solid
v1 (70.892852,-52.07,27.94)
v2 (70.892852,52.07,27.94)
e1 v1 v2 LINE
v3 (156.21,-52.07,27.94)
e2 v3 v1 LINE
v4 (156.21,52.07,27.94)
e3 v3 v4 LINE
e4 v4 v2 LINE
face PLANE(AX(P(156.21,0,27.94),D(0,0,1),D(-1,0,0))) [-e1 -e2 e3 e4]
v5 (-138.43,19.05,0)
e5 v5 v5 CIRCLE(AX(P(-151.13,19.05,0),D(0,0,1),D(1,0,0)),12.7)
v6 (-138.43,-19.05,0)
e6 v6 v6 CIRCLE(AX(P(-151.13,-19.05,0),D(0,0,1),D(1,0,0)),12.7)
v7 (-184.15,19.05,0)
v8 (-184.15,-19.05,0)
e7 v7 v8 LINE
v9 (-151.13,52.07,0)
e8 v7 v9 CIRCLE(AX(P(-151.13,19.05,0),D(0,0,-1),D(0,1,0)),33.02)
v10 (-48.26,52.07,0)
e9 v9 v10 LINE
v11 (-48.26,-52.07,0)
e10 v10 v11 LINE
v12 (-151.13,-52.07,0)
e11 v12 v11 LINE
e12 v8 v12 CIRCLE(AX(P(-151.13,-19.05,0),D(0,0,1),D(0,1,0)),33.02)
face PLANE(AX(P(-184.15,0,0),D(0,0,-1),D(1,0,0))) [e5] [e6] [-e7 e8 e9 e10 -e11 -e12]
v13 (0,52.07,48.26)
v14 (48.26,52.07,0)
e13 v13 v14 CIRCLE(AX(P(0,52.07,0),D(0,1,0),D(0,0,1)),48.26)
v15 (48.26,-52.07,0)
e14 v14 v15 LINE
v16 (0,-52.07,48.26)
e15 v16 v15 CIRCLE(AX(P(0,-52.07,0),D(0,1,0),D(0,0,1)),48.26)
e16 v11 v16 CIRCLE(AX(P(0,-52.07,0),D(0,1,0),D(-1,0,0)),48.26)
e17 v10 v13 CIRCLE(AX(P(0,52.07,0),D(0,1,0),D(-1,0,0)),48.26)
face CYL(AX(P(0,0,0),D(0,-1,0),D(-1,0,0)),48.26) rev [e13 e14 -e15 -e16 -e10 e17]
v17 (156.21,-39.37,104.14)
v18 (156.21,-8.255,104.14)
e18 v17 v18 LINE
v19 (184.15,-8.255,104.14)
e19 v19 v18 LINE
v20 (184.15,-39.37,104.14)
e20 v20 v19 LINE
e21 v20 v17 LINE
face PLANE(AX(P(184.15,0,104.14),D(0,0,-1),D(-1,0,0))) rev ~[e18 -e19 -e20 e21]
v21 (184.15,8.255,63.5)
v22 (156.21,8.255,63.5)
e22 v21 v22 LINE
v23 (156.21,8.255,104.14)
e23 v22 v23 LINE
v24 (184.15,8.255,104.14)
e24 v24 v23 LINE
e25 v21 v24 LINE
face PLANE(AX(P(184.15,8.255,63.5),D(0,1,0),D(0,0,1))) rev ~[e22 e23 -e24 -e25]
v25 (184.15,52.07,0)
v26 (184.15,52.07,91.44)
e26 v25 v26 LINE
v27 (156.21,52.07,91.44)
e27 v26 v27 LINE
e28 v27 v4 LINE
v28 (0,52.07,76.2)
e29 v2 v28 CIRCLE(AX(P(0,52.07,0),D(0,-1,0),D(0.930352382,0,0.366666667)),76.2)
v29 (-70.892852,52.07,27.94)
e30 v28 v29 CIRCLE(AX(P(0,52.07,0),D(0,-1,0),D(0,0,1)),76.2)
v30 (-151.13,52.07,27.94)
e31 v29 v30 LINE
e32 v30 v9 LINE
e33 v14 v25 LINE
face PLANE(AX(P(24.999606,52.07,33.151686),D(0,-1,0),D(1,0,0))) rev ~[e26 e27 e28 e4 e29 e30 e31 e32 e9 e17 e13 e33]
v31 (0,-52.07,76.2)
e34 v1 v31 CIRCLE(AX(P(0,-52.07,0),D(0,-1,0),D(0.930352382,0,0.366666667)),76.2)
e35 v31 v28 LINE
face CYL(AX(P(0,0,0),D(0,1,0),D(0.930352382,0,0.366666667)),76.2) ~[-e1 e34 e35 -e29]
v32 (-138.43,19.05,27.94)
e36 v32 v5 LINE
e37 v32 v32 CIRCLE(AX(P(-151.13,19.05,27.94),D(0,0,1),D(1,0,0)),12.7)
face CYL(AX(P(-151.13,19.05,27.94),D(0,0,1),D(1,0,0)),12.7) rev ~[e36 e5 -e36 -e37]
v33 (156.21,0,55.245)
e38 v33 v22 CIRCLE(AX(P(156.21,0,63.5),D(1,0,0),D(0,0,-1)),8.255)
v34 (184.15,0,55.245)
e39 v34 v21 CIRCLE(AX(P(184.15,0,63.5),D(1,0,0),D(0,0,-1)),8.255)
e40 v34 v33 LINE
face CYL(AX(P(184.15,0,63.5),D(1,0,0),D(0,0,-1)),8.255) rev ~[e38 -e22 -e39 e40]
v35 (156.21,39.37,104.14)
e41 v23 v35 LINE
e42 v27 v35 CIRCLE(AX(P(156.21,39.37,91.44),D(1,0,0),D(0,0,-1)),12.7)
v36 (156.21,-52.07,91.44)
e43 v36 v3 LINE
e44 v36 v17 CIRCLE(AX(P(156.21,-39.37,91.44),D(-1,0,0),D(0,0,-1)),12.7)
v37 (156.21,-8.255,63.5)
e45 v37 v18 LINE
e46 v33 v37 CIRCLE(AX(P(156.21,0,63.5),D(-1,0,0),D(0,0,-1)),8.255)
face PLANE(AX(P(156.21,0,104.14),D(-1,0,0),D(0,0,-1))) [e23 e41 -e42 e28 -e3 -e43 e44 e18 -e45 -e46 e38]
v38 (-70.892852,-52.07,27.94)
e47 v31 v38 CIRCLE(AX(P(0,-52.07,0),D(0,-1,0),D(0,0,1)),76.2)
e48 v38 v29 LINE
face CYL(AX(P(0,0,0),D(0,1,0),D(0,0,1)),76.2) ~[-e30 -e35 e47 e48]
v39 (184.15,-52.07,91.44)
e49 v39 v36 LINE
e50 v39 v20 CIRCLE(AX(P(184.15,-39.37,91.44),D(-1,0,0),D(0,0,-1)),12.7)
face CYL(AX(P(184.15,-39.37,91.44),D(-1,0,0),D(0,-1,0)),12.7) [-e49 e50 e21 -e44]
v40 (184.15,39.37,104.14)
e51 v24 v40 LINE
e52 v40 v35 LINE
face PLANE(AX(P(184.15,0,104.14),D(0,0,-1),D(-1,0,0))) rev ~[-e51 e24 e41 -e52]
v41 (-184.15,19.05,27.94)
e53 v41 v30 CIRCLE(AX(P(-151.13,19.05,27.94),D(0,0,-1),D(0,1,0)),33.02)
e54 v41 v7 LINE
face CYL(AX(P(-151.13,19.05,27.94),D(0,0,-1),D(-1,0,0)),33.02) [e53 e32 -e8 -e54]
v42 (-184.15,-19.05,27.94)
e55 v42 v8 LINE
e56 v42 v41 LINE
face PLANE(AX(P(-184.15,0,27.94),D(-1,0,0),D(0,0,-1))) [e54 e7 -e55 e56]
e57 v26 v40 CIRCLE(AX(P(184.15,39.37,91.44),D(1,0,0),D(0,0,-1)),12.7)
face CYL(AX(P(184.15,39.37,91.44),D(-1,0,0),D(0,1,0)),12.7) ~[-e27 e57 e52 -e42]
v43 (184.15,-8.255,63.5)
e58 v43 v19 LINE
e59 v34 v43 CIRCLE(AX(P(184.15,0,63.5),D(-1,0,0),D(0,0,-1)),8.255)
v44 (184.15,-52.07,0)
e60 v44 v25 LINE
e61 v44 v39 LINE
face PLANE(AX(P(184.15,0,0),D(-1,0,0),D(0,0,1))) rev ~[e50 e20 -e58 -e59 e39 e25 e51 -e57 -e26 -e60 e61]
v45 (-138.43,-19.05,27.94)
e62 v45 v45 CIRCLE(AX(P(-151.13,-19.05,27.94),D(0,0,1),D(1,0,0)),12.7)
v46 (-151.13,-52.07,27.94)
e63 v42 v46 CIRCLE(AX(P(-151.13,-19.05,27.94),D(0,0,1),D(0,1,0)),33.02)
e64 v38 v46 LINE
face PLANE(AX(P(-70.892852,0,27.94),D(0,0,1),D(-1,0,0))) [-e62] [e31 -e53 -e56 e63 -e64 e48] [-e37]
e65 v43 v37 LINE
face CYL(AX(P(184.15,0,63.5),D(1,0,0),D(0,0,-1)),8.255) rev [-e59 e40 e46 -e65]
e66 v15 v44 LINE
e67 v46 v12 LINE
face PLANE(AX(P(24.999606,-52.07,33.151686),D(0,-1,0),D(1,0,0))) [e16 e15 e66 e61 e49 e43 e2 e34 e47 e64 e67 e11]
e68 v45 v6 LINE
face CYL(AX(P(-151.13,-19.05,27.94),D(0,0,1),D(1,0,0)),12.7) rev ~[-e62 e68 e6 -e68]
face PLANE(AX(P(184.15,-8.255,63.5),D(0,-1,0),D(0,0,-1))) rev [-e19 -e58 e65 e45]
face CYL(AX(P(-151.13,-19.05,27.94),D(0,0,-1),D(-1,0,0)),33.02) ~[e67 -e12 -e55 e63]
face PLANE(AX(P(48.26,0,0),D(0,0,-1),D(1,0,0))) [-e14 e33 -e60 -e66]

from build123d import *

# Parameters (mm, degrees)
F1_DEPTH = 52.07
F2_R     = 33.02
F3_R     = 12.7
F4_DEPTH = 27.94
F6_DEPTH = 27.94
F7_R     = 12.7


# Not quite as in the source:
# - a pattern or mirror of a feature is missing from the dataset's text; its kind, count and spacing are read off the source's solid


with BuildPart() as f1:
    # F0 (on Front) → F1 (new body, symmetric)
    with BuildSketch(Plane.XZ):
        with BuildLine():
            Line((-184.15, 27.94), (-184.15, 0))
            Line((-184.15, 0), (-48.26, 0))
            ThreePointArc((-48.26, 0), (-34.1249732601, 34.1249732601), (0, 48.26))
            ThreePointArc((0, 48.26), (34.1249732601, 34.1249732601), (48.26, 0))
            Line((48.26, 0), (184.15, 0))
            Line((184.15, 0), (184.15, 104.14))
            Line((184.15, 104.14), (156.21, 104.14))
            Line((156.21, 104.14), (156.21, 27.94))
            Line((156.21, 27.94), (70.8928515437, 27.94))
            ThreePointArc((70.8928515437, 27.94), (42.880135261, 62.9899515796), (0, 76.2))
            ThreePointArc((0, 76.2), (-42.880135261, 62.9899515796), (-70.8928515437, 27.94))
            Line((-70.8928515437, 27.94), (-184.15, 27.94))
        make_face()
    extrude(amount=F1_DEPTH, both=True)

    # F2
    f2_edges = [f1.edges().sort_by_distance(p)[0] for p in [
        (-184.15, 52.07, 13.97),
        (-184.15, -52.07, 13.97),
    ]]
    fillet(f2_edges, radius=F2_R)

    # F3 (on face) → F4 (cut)
    with BuildSketch(Plane.XY.offset(27.94)):
        with Locations((-151.13, 19.05)):
            Circle(F3_R)
        with Locations((-151.13, -19.05)):
            Circle(F3_R)
    extrude(amount=-F4_DEPTH, mode=Mode.SUBTRACT)

    # F5 (on face) → F6 (cut)
    with BuildSketch(Plane.YZ.offset(184.15)):
        with BuildLine():
            Line((0, 104.14), (0, 55.245))
            ThreePointArc((0, 55.245), (5.8371664787, 57.6628335213), (8.255, 63.5))
            Line((8.255, 63.5), (8.255, 104.14))
            Line((8.255, 104.14), (0, 104.14))
        make_face()
    f6 = extrude(amount=-F6_DEPTH, mode=Mode.SUBTRACT)

    # F6_copies: F6 across plane
    add(f6.mirror(Plane(origin=(0, 0, 0), x_dir=(0, 0, -1), z_dir=(0, -1, 0))), mode=Mode.SUBTRACT)

    # F7
    f7_edges = [f1.edges().sort_by_distance(p)[0] for p in [
        (170.18, -52.07, 104.14),
        (170.18, 52.07, 104.14),
    ]]
    fillet(f7_edges, radius=F7_R)


solid = f1.part
